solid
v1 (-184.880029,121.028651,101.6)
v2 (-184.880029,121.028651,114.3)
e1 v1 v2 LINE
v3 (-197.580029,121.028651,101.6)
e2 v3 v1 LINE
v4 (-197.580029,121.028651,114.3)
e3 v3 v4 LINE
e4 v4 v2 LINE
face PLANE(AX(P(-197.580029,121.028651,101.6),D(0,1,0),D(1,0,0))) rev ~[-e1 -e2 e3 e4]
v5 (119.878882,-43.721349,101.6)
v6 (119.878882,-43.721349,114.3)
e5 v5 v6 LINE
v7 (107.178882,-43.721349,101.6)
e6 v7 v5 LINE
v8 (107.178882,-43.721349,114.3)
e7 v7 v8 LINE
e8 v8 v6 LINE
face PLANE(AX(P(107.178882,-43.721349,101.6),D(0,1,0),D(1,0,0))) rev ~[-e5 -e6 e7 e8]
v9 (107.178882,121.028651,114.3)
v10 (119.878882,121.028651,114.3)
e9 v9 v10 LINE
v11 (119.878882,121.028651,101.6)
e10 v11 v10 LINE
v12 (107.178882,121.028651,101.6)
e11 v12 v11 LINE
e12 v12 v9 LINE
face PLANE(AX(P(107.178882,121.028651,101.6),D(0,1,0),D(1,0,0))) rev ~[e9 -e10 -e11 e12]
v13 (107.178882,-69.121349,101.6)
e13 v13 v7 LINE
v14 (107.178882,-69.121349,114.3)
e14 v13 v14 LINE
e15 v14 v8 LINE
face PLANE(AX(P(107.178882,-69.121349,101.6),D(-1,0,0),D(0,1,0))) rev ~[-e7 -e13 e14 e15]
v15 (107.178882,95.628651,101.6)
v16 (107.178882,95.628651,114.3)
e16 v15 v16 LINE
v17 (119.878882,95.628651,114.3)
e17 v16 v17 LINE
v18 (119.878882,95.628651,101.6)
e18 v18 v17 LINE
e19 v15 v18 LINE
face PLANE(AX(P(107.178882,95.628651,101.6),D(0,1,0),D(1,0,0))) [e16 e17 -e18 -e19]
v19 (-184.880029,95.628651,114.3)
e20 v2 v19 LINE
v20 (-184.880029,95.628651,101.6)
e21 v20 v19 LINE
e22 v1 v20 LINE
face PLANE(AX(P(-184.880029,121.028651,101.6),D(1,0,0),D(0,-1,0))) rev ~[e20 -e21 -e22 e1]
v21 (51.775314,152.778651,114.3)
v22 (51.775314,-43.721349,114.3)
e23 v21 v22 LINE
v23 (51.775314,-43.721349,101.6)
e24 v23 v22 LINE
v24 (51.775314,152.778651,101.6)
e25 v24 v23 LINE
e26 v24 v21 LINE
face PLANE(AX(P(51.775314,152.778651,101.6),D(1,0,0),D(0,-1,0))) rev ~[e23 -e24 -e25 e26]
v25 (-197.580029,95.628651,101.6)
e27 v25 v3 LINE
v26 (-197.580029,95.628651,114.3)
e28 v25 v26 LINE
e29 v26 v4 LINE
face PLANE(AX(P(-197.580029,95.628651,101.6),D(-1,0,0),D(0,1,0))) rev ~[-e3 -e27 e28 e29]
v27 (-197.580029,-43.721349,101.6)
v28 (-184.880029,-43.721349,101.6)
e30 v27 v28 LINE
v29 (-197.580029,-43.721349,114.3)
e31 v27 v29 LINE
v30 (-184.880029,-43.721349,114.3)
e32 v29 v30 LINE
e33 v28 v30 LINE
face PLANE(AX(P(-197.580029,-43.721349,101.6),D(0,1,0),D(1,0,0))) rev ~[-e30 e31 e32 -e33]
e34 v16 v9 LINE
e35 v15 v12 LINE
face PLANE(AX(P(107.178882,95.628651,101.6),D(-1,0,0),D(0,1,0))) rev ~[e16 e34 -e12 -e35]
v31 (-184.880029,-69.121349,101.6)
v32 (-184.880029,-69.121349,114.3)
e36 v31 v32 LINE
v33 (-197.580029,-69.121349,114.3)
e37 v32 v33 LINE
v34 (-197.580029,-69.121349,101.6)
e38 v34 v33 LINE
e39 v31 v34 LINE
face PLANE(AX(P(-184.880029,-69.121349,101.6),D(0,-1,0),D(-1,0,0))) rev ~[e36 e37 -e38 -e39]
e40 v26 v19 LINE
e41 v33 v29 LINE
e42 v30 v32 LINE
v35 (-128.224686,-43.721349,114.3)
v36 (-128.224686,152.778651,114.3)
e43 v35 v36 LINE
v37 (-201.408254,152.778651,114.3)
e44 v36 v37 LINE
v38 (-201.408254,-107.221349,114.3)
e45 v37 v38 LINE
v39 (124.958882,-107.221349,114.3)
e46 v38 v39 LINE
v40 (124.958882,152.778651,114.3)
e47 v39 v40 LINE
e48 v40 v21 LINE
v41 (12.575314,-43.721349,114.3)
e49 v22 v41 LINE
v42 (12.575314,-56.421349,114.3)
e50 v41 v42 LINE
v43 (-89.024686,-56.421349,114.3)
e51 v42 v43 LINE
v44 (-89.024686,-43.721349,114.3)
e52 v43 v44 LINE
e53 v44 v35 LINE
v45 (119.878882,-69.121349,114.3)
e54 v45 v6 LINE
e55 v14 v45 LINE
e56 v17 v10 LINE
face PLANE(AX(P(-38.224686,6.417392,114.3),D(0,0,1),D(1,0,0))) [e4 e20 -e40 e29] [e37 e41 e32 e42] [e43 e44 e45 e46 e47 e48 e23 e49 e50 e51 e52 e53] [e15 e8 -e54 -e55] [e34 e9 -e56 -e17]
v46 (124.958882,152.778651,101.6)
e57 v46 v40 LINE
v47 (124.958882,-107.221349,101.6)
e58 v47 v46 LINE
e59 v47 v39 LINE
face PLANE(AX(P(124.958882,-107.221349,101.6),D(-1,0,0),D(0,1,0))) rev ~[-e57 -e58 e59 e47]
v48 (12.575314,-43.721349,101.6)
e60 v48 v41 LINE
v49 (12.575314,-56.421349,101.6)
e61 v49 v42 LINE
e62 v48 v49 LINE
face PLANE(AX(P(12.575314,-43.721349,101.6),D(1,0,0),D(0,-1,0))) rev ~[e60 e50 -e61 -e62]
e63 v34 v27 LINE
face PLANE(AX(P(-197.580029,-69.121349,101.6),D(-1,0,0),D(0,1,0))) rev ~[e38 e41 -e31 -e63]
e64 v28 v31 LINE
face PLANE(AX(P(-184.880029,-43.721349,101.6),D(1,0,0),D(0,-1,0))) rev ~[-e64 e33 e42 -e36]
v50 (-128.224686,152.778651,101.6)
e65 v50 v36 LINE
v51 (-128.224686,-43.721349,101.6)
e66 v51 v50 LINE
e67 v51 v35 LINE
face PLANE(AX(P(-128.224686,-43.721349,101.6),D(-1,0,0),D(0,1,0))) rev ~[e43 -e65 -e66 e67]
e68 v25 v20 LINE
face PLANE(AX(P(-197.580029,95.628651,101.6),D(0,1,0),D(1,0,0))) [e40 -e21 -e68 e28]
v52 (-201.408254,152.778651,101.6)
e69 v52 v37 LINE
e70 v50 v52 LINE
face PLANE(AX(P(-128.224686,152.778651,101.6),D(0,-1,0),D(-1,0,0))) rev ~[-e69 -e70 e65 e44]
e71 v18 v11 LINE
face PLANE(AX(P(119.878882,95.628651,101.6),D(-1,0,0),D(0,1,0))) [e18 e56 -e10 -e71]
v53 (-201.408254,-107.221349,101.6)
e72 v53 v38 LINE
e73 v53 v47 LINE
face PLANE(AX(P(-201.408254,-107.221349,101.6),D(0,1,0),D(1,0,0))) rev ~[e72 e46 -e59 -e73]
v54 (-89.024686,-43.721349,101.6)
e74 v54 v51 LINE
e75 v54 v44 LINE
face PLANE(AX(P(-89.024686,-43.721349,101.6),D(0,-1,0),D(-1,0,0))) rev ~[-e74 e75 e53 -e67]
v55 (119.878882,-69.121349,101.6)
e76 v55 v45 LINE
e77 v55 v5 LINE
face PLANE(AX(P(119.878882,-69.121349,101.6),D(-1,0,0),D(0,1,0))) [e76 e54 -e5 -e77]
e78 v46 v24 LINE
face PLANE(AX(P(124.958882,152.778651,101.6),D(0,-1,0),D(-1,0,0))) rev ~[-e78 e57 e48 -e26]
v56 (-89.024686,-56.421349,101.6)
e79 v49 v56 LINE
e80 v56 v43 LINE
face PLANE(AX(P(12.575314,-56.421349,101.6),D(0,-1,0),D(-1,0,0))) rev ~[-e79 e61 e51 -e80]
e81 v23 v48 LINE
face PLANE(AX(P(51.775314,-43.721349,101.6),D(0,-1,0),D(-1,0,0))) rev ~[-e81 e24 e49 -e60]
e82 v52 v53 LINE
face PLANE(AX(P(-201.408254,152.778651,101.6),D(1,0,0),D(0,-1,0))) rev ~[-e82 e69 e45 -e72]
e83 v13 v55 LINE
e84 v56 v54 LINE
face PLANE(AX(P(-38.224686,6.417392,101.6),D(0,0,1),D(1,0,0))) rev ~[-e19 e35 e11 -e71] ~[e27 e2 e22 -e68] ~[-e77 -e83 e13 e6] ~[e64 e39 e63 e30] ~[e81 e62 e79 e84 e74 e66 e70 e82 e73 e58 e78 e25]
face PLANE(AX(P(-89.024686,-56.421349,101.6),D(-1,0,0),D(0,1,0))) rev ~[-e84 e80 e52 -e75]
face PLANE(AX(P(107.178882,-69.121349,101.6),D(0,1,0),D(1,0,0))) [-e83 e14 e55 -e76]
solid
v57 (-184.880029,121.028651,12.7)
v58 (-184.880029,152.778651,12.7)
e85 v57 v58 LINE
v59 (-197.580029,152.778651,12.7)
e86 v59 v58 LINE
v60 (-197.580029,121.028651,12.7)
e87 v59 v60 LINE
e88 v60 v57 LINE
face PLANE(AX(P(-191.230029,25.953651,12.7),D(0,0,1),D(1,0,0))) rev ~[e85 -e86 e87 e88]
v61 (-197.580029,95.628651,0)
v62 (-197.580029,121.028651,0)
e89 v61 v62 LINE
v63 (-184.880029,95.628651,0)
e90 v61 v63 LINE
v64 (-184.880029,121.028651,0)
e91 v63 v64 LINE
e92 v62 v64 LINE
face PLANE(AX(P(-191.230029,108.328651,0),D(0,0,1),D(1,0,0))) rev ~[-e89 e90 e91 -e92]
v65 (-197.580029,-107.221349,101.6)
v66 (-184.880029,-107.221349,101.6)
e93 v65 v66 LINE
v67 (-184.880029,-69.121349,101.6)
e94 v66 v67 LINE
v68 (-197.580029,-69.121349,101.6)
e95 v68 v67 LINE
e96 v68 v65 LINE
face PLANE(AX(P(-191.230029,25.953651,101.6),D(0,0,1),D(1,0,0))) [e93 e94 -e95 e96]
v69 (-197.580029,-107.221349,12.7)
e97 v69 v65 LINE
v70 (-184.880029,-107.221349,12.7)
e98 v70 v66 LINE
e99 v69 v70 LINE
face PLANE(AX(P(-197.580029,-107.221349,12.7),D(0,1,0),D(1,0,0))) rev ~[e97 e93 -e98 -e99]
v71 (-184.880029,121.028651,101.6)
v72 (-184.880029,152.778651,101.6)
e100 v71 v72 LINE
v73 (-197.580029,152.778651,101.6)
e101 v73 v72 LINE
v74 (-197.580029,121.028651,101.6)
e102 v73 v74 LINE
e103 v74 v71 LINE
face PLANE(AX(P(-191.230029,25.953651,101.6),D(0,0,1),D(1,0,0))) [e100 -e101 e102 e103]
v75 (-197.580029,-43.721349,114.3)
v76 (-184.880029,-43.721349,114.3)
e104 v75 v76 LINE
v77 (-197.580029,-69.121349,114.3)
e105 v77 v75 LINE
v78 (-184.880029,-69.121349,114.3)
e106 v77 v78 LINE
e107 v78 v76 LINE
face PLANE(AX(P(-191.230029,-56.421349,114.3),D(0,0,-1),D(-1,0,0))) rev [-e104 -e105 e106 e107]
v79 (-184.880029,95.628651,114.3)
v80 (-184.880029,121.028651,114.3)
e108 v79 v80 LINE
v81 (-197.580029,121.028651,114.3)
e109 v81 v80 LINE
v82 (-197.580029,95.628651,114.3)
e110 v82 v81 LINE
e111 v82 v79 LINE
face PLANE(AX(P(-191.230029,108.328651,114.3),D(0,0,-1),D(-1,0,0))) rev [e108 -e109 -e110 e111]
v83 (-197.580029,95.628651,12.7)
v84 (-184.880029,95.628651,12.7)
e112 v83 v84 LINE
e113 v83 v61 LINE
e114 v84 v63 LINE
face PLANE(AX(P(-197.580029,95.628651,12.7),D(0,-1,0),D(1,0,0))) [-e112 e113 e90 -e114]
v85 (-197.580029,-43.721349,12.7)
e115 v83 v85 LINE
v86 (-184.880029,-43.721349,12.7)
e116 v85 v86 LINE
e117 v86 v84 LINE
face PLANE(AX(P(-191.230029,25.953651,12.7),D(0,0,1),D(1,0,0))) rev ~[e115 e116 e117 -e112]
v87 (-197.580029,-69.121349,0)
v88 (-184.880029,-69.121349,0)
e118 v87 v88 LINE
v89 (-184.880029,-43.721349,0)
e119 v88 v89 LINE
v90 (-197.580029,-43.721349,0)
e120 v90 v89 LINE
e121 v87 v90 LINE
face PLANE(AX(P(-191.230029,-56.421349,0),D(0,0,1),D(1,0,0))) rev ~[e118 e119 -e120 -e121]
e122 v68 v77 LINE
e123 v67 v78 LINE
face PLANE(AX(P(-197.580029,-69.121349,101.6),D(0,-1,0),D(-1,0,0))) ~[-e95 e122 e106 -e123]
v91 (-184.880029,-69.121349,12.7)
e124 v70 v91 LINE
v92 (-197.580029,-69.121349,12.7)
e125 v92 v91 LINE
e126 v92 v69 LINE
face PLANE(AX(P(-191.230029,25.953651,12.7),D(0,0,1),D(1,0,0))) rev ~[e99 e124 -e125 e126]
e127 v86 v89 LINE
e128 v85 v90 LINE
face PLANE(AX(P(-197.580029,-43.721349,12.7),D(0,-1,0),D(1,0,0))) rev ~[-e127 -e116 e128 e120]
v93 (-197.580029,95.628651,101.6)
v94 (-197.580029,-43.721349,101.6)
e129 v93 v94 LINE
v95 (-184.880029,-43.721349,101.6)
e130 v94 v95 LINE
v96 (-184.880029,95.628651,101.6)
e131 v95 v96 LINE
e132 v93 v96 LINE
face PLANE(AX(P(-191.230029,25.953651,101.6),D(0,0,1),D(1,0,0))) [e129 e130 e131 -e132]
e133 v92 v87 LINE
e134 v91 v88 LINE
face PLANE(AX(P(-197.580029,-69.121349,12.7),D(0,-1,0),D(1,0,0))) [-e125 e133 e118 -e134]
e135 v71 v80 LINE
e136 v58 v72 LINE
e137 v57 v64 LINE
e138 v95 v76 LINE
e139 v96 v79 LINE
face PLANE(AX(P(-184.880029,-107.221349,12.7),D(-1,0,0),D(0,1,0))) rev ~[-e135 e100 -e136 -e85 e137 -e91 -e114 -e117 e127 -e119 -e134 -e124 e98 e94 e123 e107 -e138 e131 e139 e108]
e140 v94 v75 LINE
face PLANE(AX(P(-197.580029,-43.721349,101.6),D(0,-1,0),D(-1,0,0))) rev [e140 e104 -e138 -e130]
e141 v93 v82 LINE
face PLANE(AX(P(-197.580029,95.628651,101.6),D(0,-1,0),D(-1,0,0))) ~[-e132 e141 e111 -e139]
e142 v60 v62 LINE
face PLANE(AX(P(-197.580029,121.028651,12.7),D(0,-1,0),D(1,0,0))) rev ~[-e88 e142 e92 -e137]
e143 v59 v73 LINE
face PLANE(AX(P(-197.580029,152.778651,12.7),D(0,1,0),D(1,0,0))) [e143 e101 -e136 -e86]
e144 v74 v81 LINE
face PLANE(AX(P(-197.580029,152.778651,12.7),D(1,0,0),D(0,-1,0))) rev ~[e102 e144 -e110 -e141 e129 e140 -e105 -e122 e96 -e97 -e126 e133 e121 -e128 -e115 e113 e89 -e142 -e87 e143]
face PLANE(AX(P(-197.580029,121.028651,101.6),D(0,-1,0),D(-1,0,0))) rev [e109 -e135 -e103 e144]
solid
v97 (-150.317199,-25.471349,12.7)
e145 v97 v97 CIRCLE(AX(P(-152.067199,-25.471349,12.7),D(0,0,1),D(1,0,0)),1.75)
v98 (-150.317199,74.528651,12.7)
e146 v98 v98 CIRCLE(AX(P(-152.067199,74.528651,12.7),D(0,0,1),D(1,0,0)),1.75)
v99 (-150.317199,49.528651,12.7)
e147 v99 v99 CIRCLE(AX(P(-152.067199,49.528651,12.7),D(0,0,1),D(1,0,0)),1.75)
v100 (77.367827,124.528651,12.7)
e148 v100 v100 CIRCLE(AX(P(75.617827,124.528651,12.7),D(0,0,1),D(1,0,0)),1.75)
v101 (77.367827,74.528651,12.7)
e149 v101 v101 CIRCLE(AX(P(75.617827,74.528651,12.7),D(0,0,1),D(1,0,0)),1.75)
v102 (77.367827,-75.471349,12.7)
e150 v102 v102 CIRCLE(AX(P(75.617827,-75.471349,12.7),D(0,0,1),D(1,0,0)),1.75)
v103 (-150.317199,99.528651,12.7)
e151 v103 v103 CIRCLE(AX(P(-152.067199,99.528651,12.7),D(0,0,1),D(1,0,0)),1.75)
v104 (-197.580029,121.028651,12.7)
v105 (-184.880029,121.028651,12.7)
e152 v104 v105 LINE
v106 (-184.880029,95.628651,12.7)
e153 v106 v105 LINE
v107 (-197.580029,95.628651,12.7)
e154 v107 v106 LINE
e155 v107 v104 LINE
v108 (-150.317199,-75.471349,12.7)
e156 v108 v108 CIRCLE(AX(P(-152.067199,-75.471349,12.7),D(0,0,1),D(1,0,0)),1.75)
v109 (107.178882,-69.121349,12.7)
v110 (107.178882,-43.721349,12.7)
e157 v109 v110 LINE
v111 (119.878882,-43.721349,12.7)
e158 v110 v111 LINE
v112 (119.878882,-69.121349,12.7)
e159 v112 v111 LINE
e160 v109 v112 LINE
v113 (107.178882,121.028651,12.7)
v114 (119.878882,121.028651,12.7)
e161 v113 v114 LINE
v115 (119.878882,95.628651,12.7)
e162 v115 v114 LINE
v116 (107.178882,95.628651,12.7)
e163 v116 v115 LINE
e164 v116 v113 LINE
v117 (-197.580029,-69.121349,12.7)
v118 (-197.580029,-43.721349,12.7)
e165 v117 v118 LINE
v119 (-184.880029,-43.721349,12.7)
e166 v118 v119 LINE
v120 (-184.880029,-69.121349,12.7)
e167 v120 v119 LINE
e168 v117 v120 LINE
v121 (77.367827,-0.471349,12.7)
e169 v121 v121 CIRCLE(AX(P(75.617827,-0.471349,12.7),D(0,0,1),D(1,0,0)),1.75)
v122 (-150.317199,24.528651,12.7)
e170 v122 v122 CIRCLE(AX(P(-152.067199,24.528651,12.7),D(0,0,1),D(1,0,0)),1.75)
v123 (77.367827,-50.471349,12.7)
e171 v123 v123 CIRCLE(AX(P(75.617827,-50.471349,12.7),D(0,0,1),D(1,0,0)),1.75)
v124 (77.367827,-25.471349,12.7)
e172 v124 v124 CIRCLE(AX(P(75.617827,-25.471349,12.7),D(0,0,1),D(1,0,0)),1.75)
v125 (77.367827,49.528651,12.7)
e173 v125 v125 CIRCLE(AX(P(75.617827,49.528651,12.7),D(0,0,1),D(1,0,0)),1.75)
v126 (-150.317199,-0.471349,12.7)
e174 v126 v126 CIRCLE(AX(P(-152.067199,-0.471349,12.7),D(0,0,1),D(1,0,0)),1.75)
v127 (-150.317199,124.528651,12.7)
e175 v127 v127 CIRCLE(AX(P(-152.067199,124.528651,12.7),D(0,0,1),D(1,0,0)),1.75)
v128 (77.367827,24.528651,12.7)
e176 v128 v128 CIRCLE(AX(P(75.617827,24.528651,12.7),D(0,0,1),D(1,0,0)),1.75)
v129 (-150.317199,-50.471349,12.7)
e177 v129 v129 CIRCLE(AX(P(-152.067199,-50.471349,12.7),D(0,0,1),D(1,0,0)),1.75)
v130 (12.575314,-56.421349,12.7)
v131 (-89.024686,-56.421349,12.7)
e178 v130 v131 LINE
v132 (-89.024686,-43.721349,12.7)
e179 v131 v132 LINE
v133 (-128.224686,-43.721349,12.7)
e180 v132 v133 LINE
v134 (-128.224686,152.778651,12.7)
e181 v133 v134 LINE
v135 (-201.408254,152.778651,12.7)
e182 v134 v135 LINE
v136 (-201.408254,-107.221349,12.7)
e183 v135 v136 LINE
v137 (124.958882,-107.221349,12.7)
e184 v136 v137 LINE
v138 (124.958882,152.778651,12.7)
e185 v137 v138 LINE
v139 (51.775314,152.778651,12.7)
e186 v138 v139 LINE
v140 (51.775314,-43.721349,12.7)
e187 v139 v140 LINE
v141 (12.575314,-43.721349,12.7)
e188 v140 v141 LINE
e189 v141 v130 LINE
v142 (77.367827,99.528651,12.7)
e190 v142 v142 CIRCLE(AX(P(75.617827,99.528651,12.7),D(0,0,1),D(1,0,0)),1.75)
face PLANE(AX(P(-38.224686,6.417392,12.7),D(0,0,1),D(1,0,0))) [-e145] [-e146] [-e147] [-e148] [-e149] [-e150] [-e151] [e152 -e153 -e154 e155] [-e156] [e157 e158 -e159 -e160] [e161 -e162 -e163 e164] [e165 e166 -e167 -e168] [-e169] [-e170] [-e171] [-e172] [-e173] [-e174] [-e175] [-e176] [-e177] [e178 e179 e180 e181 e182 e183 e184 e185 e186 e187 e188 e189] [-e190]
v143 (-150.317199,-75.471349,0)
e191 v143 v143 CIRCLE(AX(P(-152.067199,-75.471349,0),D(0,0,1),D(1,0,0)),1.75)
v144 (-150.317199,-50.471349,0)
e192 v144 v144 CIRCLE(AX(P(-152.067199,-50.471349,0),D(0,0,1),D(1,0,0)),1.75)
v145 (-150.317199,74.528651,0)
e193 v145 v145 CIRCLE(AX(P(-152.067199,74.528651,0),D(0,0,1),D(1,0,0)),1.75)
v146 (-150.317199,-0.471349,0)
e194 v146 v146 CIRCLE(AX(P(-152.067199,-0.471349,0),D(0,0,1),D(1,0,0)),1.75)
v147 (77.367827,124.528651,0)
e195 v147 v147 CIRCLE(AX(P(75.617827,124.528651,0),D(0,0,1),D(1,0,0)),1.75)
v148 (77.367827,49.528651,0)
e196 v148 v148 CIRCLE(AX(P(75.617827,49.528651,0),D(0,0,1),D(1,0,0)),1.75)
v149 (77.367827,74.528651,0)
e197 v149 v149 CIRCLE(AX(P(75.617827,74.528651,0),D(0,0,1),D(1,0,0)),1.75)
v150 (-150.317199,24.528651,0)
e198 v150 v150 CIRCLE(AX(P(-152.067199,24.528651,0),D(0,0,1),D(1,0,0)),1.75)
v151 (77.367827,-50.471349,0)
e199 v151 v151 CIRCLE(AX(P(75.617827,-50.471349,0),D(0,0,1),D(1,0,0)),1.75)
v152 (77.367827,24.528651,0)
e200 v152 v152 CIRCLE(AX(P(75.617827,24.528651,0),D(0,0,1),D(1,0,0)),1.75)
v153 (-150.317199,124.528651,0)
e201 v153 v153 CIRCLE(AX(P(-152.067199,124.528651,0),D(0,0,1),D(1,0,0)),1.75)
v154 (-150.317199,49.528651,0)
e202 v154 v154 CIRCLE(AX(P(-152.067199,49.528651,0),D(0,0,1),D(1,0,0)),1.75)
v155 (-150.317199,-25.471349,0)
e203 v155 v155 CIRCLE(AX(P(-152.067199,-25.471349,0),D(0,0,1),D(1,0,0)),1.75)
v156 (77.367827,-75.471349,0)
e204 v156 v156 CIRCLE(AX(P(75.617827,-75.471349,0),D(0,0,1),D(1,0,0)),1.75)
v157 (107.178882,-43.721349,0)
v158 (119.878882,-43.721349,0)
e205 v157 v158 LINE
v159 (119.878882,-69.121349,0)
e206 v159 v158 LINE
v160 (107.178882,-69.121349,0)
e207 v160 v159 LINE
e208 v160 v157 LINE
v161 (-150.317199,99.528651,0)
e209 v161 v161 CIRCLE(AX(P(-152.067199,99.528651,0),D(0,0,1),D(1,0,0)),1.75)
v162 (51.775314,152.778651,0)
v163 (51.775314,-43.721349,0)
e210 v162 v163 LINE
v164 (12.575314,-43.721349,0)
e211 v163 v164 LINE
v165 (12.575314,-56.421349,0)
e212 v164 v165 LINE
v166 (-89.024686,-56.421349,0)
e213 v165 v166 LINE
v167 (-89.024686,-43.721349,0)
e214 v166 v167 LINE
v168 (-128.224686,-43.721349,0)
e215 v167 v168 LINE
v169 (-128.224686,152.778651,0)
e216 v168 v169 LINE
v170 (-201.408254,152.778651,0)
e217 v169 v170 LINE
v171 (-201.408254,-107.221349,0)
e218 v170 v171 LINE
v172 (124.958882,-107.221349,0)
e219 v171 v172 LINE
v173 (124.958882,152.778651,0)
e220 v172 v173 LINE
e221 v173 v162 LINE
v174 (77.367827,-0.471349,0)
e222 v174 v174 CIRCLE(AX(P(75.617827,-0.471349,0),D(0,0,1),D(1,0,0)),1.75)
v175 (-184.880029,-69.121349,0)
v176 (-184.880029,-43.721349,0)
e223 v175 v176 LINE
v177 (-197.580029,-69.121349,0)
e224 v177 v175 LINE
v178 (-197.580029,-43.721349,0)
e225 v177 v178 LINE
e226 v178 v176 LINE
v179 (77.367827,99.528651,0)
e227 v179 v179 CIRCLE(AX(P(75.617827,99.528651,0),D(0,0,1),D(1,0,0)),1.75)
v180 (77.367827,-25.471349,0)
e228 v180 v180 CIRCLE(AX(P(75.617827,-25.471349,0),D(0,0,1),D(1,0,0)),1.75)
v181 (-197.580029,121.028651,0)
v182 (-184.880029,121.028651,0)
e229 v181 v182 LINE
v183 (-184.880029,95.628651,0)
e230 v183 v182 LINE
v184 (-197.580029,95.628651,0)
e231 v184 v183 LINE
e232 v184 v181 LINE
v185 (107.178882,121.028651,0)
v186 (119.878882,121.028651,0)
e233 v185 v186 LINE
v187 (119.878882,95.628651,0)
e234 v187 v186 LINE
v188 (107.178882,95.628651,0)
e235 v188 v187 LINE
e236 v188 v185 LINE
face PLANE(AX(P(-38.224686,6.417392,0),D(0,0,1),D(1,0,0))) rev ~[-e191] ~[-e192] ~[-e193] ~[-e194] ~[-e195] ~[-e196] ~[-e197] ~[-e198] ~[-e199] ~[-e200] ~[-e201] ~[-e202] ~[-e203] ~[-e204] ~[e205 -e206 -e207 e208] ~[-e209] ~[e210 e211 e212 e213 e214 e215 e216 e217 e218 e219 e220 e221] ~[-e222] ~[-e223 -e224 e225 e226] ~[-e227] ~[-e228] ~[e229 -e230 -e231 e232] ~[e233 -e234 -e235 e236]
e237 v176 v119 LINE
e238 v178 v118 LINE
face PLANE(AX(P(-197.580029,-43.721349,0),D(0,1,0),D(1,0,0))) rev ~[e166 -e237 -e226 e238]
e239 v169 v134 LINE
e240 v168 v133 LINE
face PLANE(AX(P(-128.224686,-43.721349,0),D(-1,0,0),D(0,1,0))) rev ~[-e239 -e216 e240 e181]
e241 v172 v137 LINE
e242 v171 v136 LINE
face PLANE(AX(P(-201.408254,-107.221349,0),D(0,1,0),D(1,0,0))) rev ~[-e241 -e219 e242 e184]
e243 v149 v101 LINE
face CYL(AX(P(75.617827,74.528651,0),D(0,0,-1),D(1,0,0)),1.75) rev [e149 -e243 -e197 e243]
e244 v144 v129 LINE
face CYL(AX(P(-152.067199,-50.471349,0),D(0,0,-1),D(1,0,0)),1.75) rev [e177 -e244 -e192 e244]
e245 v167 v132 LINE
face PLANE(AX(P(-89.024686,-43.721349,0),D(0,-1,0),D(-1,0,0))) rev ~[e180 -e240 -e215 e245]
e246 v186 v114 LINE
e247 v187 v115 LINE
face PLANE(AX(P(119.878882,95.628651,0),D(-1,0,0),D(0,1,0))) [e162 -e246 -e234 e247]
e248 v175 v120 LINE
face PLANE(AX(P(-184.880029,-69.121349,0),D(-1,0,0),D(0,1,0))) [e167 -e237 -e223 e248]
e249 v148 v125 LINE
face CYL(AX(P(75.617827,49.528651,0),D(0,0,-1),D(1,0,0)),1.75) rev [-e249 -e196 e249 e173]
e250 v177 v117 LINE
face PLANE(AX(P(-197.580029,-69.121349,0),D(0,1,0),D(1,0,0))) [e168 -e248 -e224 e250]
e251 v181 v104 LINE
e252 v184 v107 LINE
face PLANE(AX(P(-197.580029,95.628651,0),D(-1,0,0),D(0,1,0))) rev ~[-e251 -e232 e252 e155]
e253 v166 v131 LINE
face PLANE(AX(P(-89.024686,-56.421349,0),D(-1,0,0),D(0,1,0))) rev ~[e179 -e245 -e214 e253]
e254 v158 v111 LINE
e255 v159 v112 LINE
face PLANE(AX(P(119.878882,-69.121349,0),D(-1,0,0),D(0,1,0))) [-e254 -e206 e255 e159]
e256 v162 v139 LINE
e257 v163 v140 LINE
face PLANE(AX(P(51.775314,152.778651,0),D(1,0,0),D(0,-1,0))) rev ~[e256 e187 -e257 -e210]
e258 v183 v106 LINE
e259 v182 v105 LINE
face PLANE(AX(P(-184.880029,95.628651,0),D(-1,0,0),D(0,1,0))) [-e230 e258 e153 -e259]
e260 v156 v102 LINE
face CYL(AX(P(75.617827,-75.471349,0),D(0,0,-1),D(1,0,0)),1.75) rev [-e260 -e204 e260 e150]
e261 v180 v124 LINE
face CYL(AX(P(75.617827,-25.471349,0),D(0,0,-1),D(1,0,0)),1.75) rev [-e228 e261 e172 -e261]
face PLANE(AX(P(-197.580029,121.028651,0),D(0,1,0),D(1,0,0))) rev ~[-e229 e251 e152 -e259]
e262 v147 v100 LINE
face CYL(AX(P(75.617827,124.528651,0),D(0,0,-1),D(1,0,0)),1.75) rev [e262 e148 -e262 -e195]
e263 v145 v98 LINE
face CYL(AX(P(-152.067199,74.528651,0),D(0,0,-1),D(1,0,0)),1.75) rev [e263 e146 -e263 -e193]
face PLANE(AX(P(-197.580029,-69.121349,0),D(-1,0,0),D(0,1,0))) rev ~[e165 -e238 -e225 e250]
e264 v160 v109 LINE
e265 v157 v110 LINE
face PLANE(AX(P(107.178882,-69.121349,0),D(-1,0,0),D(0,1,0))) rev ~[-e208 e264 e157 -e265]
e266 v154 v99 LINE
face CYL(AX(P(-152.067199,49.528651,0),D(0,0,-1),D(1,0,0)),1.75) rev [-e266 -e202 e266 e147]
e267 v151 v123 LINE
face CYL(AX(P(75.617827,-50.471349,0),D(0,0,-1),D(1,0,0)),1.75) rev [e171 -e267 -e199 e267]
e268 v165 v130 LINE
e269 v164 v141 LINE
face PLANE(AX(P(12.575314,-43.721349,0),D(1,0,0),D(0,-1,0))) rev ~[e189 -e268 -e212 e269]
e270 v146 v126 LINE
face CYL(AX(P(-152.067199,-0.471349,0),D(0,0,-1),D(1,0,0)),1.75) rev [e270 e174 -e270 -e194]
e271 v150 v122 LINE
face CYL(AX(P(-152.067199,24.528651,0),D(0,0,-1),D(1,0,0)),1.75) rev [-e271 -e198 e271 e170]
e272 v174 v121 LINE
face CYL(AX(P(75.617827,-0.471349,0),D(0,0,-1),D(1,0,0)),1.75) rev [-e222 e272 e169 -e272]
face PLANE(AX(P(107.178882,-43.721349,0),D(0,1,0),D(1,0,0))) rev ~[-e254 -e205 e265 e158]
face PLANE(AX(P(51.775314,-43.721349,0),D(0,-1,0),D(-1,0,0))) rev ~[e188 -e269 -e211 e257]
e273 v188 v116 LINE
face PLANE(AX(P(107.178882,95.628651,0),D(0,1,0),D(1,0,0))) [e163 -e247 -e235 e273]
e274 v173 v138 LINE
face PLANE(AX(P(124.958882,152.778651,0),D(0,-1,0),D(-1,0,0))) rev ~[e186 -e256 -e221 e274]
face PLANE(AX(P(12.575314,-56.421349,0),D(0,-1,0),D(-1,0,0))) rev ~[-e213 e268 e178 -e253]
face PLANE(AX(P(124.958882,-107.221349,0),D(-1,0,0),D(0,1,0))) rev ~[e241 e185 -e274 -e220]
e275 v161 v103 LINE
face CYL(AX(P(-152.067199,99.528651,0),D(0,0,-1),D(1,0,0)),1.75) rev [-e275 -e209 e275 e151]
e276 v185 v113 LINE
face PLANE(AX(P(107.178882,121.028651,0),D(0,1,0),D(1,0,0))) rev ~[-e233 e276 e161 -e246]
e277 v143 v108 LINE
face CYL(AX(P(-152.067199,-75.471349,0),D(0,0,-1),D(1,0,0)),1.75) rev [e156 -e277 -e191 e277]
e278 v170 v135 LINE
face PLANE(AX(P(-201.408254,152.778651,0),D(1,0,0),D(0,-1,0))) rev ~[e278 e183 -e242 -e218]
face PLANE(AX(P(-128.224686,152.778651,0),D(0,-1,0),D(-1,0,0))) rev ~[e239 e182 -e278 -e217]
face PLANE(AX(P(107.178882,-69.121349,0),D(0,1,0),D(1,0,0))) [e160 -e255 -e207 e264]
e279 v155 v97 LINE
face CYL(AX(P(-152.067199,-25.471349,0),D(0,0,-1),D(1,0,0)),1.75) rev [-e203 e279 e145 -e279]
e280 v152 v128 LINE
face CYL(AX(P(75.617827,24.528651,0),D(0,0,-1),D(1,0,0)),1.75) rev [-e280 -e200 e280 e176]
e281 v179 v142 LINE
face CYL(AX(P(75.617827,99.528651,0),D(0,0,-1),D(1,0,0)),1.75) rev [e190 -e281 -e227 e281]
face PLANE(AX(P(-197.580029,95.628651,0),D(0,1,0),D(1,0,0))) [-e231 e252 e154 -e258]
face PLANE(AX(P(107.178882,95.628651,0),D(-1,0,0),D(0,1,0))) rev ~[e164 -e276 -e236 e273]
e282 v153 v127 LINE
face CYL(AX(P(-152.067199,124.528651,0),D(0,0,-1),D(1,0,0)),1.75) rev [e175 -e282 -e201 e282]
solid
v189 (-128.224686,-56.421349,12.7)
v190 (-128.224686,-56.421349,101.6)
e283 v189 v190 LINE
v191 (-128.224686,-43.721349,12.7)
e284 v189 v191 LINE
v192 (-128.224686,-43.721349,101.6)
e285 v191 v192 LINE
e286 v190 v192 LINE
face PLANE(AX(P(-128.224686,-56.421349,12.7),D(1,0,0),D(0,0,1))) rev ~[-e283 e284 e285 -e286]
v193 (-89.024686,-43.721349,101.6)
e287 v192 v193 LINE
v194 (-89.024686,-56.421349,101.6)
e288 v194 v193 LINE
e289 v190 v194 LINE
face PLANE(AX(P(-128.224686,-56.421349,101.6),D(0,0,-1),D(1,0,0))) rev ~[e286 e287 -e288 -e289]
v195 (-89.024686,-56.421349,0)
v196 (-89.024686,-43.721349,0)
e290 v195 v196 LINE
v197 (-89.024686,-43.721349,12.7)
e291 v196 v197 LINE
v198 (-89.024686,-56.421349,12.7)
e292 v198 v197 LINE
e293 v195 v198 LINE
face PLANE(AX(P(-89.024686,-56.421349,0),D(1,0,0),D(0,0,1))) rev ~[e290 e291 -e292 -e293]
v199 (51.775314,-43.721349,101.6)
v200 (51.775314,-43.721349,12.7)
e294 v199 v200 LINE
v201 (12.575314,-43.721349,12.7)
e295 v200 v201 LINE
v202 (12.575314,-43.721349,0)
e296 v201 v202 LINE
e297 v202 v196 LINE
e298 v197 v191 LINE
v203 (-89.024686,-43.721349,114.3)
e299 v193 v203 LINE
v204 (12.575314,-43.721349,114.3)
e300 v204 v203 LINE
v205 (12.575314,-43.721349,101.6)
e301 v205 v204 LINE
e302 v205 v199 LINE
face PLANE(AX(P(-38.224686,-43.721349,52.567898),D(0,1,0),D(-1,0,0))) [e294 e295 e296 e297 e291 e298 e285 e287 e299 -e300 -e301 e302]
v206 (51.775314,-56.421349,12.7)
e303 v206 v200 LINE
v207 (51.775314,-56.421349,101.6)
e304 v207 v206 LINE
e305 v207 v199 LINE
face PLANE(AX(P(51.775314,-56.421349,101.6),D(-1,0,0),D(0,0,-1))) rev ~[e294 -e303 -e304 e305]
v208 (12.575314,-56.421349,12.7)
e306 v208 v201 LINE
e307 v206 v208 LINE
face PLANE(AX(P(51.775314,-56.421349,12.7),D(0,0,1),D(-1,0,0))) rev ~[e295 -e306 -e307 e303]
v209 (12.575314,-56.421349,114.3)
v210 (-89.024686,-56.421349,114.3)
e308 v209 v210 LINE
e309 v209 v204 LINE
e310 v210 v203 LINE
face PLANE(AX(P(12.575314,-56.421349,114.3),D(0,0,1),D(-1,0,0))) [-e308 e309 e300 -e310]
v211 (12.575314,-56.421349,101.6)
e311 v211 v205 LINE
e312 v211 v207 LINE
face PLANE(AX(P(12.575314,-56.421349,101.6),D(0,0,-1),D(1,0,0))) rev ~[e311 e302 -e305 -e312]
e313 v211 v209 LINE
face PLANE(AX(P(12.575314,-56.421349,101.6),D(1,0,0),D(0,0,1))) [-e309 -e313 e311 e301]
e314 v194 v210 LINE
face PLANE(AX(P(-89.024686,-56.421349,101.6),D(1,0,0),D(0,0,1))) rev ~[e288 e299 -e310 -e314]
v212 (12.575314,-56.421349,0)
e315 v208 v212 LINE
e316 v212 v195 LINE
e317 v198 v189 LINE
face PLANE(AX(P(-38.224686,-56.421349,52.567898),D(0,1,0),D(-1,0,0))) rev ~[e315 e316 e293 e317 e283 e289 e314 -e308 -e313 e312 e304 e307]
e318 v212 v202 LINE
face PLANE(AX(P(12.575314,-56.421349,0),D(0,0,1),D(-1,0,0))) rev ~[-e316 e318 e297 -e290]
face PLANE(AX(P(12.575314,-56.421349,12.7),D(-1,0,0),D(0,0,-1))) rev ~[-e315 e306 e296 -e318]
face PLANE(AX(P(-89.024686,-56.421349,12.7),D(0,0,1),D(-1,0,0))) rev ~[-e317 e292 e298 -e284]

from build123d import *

# Parameters (mm, degrees)
F1_R      = 1.75
F1_W      = 12.7
F1_H      = 25.4
F2_DEPTH  = 12.7
F3_W      = 12.7
F3_H      = 139.35
F3_H_2    = 38.1
F3_H_3    = 25.4
F3_H_4    = 31.75
F4_DEPTH  = 88.9
F5_DEPTH  = 12.7
F6_W      = 12.7
F6_H      = 25.4
F6_H_2    = 139.35
F7_DEPTH  = 12.7
F9_W      = 101.6
F9_H      = 12.7
F10_DEPTH = 12.7


# Not quite as in the source:
# - a feature of the source that left no trace in its solid (it failed there, or was rolled back) is left out
# - a pattern or mirror of a feature is missing from the dataset's text; its kind, count and spacing are read off the source's solid


with BuildPart() as f2:
    # F1 (on Top) → F2 (new body)
    with BuildSketch(Plane.XY):
        Polygon((-128.2246859372, 152.7786509395), (-201.4082543561, 152.7786509395), (-201.4082543561, -107.2213490605), (124.9588824817, -107.2213490605), (124.9588824817, 152.7786509395), (51.7753140628, 152.7786509395), (51.7753140628, -43.7213490605), (12.5753140628, -43.7213490605), (12.5753140628, -56.4213490605), (-89.0246859372, -56.4213490605), (-89.0246859372, -43.7213490605), (-128.2246859372, -43.7213490605), align=None)
        with Locations((-152.0671993494, -75.4713490605)):
            Circle(F1_R, mode=Mode.SUBTRACT)
        with Locations((-191.2300288677, -56.4213490605)):
            Rectangle(F1_W, F1_H, mode=Mode.SUBTRACT)
        with Locations((-152.0671993494, -50.4713490605)):
            Circle(F1_R, mode=Mode.SUBTRACT)
        with Locations((-152.0671993494, -25.4713490605)):
            Circle(F1_R, mode=Mode.SUBTRACT)
        with Locations((-152.0671993494, -0.4713490605)):
            Circle(F1_R, mode=Mode.SUBTRACT)
        with Locations((75.6178274751, -75.4713490605)):
            Circle(F1_R, mode=Mode.SUBTRACT)
        with Locations((75.6178274751, -50.4713490605)):
            Circle(F1_R, mode=Mode.SUBTRACT)
        with Locations((113.5288824817, -56.4213490605)):
            Rectangle(F1_W, F1_H, mode=Mode.SUBTRACT)
        with Locations((75.6178274751, -25.4713490605)):
            Circle(F1_R, mode=Mode.SUBTRACT)
        with Locations((75.6178274751, -0.4713490605)):
            Circle(F1_R, mode=Mode.SUBTRACT)
        with Locations((-152.0671993494, 24.5286509395)):
            Circle(F1_R, mode=Mode.SUBTRACT)
        with Locations((-152.0671993494, 49.5286509395)):
            Circle(F1_R, mode=Mode.SUBTRACT)
        with Locations((-152.0671993494, 74.5286509395)):
            Circle(F1_R, mode=Mode.SUBTRACT)
        with Locations((-191.2300288677, 108.3286509395)):
            Rectangle(F1_W, F1_H, mode=Mode.SUBTRACT)
        with Locations((-152.0671993494, 99.5286509395)):
            Circle(F1_R, mode=Mode.SUBTRACT)
        with Locations((-152.0671993494, 124.5286509395)):
            Circle(F1_R, mode=Mode.SUBTRACT)
        with Locations((75.6178274751, 24.5286509395)):
            Circle(F1_R, mode=Mode.SUBTRACT)
        with Locations((75.6178274751, 49.5286509395)):
            Circle(F1_R, mode=Mode.SUBTRACT)
        with Locations((75.6178274751, 74.5286509395)):
            Circle(F1_R, mode=Mode.SUBTRACT)
        with Locations((75.6178274751, 99.5286509395)):
            Circle(F1_R, mode=Mode.SUBTRACT)
        with Locations((113.5288824817, 108.3286509395)):
            Rectangle(F1_W, F1_H, mode=Mode.SUBTRACT)
        with Locations((75.6178274751, 124.5286509395)):
            Circle(F1_R, mode=Mode.SUBTRACT)
    extrude(amount=F2_DEPTH)


with BuildPart() as f4:
    # F3 (on face) → F4 (new body)
    with BuildSketch(Plane.XY.offset(12.7)):
        with Locations((-191.2300288677, 25.9536509395)):
            Rectangle(F3_W, F3_H)
        with Locations((-191.2300288677, -88.1713490605)):
            Rectangle(F3_W, F3_H_2)
        with Locations((-191.2300288677, 108.3286509395)):
            Rectangle(F3_W, F3_H_3)
        with Locations((-191.2300288677, 136.9036509395)):
            Rectangle(F3_W, F3_H_4)
        with Locations((-191.2300288677, -56.4213490605)):
            Rectangle(F3_W, F3_H_3)
    extrude(amount=F4_DEPTH)

    # F3 (on face) → F5 (join, through all)
    with BuildSketch(Plane.XY.offset(12.7)):
        with Locations((-191.2300288677, -56.4213490605)):
            Rectangle(F3_W, F3_H_3)
        with Locations((-191.2300288677, 108.3286509395)):
            Rectangle(F3_W, F3_H_3)
    f5 = extrude(amount=-F5_DEPTH)

    # F5_copies: F5 across plane
    add(f5.mirror(Plane.XY.offset(57.15)))


with BuildPart() as f7:
    # F6 (on face) → F7 (new body)
    with BuildSketch(Plane.XY.offset(101.6)):
        Polygon((-128.2246859372, 152.7786509395), (-201.4082543561, 152.7786509395), (-201.4082543561, -107.2213490605), (124.9588824817, -107.2213490605), (124.9588824817, 152.7786509395), (51.7753140628, 152.7786509395), (51.7753140628, -43.7213490605), (12.5753140628, -43.7213490605), (12.5753140628, -56.4213490605), (-89.0246859372, -56.4213490605), (-89.0246859372, -43.7213490605), (-128.2246859372, -43.7213490605), align=None)
        with Locations((113.5288824817, -56.4213490605)):
            Rectangle(F6_W, F6_H, mode=Mode.SUBTRACT)
        Polygon((-197.5800288677, -43.7213490605), (-197.5800288677, 95.6286509395), (-197.5800288677, 121.0286509395), (-184.8800288677, 121.0286509395), (-184.8800288677, 95.6286509395), (-184.8800288677, -43.7213490605), (-184.8800288677, -69.1213490605), (-197.5800288677, -69.1213490605), align=None, mode=Mode.SUBTRACT)
        with Locations((113.5288824817, 108.3286509395)):
            Rectangle(F6_W, F6_H, mode=Mode.SUBTRACT)
        with Locations((-191.2300288677, 25.9536509395)):
            Rectangle(F6_W, F6_H_2)
    extrude(amount=F7_DEPTH)


with BuildPart() as f10:
    # F9 (on face) → F10 (new body, through all)
    with BuildSketch(Plane(origin=(0, -56.4213490605, 0), x_dir=(-1, 0, 0), z_dir=(0, 1, 0))):
        Polygon((89.0246859372, 101.6), (-12.5753140628, 101.6), (-51.7753140628, 101.6), (-51.7753140628, 12.7), (-12.5753140628, 12.7), (-12.5753140628, 0), (89.0246859372, 0), (89.0246859372, 12.7), (128.2246859372, 12.7), (128.2246859372, 101.6), align=None)
        with Locations((38.2246859372, 107.95)):
            Rectangle(F9_W, F9_H)
    extrude(amount=F10_DEPTH)


solid = Compound([f2.part, f4.part, f7.part, f10.part])
